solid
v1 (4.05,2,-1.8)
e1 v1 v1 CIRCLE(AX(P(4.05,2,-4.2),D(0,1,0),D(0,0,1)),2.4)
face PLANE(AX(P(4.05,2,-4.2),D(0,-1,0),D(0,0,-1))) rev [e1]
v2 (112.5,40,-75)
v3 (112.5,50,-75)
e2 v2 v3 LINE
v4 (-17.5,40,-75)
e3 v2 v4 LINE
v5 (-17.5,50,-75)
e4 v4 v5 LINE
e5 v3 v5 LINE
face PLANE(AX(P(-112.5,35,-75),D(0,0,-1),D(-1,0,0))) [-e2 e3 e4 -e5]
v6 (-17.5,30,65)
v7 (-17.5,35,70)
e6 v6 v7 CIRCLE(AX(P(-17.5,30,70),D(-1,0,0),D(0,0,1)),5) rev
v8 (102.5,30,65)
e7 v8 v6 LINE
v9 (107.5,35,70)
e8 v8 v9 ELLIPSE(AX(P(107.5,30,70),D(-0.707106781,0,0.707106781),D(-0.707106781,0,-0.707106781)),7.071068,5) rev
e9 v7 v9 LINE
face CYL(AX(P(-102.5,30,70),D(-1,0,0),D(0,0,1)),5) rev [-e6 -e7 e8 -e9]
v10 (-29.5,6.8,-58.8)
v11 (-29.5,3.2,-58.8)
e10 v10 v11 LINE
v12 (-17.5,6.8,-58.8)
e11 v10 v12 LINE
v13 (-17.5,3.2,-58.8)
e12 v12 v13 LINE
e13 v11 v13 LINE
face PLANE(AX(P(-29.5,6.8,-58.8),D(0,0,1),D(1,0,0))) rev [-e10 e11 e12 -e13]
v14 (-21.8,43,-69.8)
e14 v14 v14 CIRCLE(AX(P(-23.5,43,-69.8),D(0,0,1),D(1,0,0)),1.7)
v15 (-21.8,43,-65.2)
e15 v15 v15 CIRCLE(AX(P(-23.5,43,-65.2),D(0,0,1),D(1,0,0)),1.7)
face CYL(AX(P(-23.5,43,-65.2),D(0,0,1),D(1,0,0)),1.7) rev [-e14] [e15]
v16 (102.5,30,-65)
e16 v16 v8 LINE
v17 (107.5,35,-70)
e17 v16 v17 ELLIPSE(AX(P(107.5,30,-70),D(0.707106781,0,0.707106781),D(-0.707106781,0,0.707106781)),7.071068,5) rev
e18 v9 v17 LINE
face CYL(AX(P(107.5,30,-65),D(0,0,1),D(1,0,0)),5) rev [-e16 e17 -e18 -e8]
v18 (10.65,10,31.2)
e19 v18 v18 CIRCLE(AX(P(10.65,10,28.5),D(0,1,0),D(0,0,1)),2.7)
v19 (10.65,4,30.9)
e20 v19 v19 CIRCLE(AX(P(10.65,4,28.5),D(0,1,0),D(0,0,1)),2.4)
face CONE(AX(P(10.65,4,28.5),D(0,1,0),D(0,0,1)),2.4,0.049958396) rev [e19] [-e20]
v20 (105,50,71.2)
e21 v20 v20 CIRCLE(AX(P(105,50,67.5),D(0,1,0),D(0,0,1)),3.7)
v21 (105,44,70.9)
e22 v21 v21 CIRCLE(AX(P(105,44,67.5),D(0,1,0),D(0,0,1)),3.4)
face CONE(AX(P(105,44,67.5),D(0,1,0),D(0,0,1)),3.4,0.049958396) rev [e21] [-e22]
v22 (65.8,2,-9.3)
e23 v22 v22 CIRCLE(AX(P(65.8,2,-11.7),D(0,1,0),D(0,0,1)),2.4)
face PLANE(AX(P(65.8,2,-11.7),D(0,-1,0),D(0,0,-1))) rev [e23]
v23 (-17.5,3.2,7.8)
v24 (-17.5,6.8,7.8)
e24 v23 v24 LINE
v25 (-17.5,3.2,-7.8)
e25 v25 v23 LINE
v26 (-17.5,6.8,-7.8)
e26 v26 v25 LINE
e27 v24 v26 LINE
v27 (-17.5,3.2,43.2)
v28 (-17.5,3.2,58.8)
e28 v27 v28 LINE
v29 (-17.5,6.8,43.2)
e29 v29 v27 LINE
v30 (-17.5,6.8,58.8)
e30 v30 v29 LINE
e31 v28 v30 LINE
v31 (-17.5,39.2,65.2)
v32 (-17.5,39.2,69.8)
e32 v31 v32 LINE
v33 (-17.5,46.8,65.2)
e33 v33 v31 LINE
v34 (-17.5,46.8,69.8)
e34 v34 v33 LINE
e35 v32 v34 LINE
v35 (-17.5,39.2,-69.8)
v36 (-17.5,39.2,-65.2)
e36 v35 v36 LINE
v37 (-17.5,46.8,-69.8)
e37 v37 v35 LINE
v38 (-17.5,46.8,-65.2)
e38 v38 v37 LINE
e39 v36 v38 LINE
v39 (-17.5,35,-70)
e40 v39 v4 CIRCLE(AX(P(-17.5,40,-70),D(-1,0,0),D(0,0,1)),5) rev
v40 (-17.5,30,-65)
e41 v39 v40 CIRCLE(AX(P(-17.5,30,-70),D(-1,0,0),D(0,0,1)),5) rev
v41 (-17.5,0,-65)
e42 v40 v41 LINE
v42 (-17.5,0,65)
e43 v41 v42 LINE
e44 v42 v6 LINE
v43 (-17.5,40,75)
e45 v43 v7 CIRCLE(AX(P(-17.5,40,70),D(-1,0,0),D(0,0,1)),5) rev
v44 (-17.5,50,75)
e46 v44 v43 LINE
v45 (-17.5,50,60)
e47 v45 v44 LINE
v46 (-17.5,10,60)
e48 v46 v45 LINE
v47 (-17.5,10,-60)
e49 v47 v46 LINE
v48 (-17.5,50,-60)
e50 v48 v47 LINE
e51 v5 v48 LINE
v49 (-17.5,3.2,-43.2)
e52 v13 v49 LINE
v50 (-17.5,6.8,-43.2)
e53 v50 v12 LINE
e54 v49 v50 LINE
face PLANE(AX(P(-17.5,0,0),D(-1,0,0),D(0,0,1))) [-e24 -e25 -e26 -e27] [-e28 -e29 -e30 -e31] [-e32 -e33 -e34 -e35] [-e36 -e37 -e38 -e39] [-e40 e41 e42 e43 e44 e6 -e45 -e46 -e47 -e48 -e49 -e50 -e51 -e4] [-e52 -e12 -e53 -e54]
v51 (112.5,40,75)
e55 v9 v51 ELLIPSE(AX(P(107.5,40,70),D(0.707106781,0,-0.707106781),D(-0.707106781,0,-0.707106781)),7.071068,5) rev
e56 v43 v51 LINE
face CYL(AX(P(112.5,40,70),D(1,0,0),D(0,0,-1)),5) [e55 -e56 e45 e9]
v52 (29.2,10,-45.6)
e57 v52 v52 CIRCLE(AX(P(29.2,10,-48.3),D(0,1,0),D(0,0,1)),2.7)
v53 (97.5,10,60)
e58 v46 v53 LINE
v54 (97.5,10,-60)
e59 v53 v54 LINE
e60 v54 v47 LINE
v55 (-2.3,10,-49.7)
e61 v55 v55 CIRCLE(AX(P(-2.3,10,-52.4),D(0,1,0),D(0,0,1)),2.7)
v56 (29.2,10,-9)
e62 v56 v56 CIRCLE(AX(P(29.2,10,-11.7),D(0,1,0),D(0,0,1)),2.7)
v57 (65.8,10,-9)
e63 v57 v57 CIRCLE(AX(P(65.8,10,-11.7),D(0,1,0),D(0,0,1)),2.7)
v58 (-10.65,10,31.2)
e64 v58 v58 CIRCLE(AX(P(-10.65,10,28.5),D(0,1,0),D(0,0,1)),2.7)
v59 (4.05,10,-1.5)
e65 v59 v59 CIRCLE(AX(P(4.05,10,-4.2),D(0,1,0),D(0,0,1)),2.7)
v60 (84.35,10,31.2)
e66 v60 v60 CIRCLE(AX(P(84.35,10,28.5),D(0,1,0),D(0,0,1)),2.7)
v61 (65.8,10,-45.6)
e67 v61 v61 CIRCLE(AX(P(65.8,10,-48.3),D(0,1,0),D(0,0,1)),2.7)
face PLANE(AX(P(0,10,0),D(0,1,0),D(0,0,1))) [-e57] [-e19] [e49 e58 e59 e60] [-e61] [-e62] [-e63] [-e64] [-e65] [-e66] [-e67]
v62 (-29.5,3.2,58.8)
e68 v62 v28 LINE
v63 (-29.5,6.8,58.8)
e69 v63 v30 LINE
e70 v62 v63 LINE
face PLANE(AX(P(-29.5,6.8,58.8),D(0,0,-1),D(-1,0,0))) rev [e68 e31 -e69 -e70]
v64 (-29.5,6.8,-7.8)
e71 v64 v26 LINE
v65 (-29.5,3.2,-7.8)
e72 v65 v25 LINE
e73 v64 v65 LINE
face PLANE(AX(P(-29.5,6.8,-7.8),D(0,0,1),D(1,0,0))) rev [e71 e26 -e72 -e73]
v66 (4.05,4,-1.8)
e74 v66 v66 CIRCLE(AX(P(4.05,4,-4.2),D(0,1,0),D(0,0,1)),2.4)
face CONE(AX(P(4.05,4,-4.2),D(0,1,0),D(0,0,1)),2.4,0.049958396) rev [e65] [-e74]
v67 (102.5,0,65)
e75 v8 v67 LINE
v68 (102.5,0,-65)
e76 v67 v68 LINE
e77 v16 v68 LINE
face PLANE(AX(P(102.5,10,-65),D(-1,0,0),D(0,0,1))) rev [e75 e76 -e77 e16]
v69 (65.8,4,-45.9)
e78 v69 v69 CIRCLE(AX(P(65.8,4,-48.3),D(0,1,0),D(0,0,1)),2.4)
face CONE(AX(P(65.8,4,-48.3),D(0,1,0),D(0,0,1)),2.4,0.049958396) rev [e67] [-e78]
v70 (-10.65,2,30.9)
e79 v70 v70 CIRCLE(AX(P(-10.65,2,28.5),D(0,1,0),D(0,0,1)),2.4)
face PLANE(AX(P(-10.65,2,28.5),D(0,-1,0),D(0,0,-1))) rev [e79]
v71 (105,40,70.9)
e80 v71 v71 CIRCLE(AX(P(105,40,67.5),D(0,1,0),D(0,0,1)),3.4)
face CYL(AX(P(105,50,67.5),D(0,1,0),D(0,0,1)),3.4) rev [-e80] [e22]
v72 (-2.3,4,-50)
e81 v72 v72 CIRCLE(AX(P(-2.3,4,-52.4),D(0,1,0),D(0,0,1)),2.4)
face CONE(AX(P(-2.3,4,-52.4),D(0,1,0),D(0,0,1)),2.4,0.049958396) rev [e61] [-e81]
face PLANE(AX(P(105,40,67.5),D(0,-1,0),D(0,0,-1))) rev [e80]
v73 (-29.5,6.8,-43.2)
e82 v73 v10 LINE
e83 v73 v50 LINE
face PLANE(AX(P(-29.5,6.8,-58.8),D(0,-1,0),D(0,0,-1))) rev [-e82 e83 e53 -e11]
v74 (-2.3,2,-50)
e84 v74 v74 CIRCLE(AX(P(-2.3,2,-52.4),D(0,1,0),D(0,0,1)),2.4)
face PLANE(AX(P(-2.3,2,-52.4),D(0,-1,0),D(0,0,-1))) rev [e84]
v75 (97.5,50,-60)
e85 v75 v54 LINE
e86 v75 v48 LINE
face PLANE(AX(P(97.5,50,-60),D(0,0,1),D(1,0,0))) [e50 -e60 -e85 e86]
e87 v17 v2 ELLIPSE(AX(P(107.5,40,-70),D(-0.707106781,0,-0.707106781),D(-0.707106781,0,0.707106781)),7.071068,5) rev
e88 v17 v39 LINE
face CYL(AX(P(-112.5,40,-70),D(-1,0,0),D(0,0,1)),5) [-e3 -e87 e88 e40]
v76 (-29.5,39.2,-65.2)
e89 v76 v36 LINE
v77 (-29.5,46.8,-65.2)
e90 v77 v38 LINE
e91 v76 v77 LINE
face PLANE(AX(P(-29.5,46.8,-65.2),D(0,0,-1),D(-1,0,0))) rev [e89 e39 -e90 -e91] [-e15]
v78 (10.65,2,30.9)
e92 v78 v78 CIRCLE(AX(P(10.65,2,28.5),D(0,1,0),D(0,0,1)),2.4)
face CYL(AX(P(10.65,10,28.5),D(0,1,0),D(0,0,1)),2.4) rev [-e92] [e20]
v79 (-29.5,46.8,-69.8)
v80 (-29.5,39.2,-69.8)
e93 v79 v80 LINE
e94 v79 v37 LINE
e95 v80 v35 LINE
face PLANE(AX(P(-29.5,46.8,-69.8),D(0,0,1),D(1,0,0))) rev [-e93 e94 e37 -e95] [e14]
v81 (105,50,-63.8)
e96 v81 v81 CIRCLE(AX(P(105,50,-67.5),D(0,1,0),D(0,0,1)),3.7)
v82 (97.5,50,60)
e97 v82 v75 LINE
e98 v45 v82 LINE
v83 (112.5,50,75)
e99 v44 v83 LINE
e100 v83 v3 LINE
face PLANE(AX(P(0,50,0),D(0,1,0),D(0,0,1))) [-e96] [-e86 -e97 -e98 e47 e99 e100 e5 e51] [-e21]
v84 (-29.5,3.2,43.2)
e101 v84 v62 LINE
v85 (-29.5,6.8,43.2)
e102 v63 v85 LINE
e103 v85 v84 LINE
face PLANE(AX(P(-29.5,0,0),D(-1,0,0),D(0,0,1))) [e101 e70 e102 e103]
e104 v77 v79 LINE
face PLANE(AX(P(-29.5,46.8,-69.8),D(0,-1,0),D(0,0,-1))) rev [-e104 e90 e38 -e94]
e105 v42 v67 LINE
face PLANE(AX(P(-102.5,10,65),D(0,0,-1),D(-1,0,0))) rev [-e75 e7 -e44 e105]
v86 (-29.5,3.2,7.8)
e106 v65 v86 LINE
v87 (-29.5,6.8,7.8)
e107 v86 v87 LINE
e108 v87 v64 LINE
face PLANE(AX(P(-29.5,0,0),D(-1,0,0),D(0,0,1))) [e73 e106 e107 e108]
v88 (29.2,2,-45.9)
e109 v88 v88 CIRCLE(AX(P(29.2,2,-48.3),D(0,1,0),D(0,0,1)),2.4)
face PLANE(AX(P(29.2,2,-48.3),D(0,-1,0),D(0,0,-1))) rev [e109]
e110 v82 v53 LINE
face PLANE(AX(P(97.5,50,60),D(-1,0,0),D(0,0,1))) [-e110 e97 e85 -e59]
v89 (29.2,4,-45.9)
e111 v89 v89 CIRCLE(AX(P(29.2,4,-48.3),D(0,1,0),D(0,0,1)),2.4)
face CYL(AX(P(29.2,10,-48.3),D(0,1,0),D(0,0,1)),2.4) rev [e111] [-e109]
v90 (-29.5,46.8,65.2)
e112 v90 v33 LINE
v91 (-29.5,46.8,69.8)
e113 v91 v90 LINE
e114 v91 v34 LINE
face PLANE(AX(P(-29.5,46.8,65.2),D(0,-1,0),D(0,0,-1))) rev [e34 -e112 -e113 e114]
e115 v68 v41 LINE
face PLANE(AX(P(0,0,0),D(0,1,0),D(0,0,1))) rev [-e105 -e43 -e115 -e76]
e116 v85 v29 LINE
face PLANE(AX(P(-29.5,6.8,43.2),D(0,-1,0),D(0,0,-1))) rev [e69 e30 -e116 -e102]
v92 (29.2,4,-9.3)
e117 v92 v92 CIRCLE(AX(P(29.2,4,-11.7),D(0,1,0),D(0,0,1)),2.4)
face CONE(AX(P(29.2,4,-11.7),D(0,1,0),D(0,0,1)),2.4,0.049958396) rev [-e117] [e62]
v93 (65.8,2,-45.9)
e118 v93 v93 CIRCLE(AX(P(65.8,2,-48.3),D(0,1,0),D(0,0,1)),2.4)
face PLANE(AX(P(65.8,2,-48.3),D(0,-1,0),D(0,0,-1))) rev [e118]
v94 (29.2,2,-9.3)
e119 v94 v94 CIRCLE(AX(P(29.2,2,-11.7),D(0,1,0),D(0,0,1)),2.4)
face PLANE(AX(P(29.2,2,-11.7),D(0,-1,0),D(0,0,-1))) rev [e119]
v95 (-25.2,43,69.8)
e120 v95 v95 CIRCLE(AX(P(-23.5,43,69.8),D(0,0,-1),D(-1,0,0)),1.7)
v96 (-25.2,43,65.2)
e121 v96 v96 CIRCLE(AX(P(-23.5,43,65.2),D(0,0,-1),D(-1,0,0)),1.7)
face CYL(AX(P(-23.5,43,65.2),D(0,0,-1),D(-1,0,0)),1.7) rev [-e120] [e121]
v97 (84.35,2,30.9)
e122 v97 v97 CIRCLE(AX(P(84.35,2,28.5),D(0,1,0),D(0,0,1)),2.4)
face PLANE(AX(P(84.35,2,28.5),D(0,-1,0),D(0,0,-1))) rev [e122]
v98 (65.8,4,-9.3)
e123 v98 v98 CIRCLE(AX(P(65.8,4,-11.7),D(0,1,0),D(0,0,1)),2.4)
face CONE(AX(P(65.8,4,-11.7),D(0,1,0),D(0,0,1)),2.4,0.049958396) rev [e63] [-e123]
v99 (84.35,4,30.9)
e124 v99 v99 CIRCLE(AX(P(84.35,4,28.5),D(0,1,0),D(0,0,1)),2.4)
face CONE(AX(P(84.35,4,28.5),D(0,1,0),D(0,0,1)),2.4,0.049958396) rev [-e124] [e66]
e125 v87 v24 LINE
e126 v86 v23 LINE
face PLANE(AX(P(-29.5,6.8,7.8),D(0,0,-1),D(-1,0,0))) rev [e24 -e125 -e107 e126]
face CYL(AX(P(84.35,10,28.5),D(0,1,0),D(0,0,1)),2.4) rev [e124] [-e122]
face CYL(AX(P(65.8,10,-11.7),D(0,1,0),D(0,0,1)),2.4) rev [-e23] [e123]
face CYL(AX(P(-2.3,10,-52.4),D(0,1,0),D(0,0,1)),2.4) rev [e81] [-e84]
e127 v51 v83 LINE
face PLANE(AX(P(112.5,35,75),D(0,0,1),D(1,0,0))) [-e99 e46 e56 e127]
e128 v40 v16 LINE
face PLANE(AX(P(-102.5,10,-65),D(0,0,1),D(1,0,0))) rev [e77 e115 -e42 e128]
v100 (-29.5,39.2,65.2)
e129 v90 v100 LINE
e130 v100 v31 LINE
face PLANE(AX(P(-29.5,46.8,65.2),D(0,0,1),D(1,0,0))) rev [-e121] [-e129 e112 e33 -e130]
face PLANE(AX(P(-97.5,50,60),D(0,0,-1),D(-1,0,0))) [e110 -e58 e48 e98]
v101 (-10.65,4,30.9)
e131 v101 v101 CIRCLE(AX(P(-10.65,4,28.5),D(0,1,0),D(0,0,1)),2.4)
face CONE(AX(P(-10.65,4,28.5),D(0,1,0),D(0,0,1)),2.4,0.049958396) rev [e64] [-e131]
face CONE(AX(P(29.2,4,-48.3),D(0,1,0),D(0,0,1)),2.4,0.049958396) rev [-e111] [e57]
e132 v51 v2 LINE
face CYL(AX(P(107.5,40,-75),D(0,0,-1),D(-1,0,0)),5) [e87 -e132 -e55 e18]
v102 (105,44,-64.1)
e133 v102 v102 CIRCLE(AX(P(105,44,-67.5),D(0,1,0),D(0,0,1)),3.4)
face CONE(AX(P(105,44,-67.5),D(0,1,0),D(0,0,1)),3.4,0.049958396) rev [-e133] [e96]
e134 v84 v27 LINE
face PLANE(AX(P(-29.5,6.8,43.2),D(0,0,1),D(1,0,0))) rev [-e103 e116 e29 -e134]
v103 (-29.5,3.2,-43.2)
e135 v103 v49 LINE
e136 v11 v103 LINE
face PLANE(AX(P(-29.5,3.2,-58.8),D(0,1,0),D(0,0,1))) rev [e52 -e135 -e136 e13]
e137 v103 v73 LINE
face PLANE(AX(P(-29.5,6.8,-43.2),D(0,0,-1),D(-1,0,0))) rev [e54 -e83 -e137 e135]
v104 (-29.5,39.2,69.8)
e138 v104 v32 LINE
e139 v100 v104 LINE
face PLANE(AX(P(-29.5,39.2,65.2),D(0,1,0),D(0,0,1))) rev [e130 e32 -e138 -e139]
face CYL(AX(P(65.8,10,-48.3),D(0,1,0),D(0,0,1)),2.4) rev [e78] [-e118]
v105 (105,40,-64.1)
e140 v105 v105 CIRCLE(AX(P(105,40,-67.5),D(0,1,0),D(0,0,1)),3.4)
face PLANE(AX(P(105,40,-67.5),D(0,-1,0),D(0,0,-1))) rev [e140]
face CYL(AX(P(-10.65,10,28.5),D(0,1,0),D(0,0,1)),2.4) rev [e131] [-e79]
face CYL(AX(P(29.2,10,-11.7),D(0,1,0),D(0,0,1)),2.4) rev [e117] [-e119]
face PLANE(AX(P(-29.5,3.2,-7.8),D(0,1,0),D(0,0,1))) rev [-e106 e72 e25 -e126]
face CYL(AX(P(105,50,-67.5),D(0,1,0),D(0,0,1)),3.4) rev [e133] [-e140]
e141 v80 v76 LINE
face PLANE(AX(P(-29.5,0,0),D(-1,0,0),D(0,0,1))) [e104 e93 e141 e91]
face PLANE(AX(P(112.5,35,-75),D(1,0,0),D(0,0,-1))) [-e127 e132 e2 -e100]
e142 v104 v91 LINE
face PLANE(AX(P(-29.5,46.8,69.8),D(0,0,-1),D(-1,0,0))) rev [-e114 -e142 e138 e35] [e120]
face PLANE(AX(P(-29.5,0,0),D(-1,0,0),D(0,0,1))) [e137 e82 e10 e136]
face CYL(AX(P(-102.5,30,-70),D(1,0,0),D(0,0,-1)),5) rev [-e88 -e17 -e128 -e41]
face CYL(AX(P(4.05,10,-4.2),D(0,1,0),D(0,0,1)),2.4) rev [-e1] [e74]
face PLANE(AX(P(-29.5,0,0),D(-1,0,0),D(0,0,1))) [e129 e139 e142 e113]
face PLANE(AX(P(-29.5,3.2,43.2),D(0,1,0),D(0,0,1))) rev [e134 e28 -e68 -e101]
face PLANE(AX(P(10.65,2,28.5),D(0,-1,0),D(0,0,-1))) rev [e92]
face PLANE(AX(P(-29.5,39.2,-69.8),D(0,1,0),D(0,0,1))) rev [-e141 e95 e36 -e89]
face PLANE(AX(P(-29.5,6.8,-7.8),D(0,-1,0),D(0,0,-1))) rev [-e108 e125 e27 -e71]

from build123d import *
from OCP.BRepFilletAPI import BRepFilletAPI_MakeChamfer

# Parameters (mm, degrees)
SKETCH1_W                = 205
SKETCH1_H                = 130
BOSS_EXTRUDE1_DEPTH      = 10
SKETCH2_W                = 205
SKETCH2_H                = 130
SKETCH2_W_2              = 195
SKETCH2_H_2              = 120
BOSS_EXTRUDE2_DEPTH      = 40
CUT_EXTRUDE1_REACH       = 222.794
SKETCH6_W                = 60
SKETCH6_H                = 40
HOLE1_D                  = 4.8
HOLE1_DEPTH              = 8
HOLE1_CBORE_D            = 5.4
HOLE1_CBORE_DEPTH        = 6
CHAMFER1_SIZE            = 6
CHAMFER1_SIZE_2          = 0.3
BOSS_EXTRUDE3_DEPTH      = 15
FILLET1_R                = 5
HOLE2_D                  = 6.8
HOLE2_DEPTH              = 10
HOLE2_CBORE_D            = 7.4
HOLE2_CBORE_DEPTH        = 6
CHAMFER2_SIZE            = 6
CHAMFER2_SIZE_2          = 0.3
SKETCH14_W               = 179.585790587
SKETCH14_H               = 72.16534995
CUT_EXTRUDE2_DEPTH       = 150
SKETCH15_W               = 15.6
SKETCH15_H               = 3.6
SKETCH15_W_2             = 4.6
SKETCH15_H_2             = 7.6
BOSS_EXTRUDE4_DEPTH      = 12
M3_CLEARANCE_HOLE1_D     = 3.4
M3_CLEARANCE_HOLE1_DEPTH = 9.8


with BuildPart() as part:
    # Sketch1 → Boss-Extrude1 (new body)
    with BuildSketch(Plane(origin=(0, 0, 0), x_dir=(1, 0, 0), z_dir=(0, 1, 0))):
        Rectangle(SKETCH1_W, SKETCH1_H)
    extrude(amount=BOSS_EXTRUDE1_DEPTH)

    # Sketch2 → Boss-Extrude2 (add)
    with BuildSketch(Plane(origin=(0, 10, 0), x_dir=(1, 0, 0), z_dir=(0, 1, 0))):
        Rectangle(SKETCH2_W, SKETCH2_H)
        Rectangle(SKETCH2_W_2, SKETCH2_H_2, mode=Mode.SUBTRACT)
    extrude(amount=BOSS_EXTRUDE2_DEPTH)

    # Sketch6 → Cut-Extrude1 (cut, up to next)
    with BuildSketch(Plane.ZY.offset(102.5), mode=Mode.PRIVATE) as cut_extrude1_sk1:
        with Locations((-30, 30)):
            Rectangle(SKETCH6_W, SKETCH6_H)
    cut_extrude1_tool1 = extrude(cut_extrude1_sk1.sketch, amount=-CUT_EXTRUDE1_REACH, mode=Mode.PRIVATE) & part.part
    add(cut_extrude1_tool1.solids().sort_by_distance((-102.5, 30, -30))[0], mode=Mode.SUBTRACT)

    # Hole1
    with Locations(Plane(origin=(0, 10, 0), x_dir=(1, 0, 0), z_dir=(0, 1, 0))):
        with Locations((-84.35, -28.5), (-10.65, -28.5), (-78.5, 4.2), (-77.2, 52.4), (-26.4, 9.3), (-26.4, 37.2), (-2.3, 52.4), (4.05, 4.2), (29.2, 48.3), (65.8, 48.3), (65.8, 11.7), (29.2, 11.7), (10.65, -28.5), (84.35, -28.5)):
            CounterBoreHole(HOLE1_D / 2, HOLE1_CBORE_D / 2, HOLE1_CBORE_DEPTH, depth=HOLE1_DEPTH)

    # Chamfer1
    chamfer1_edges_1 = [part.edges().sort_by_distance(p)[0] for p in [
        (-5, 4, -52.4),
    ]]
    chamfer1_side_1 = [part.faces().sort_by_distance(p)[0] for p in [
        (-5, 4.006, -52.4),
    ]]
    chamfer1_edges_2 = [part.edges().sort_by_distance(p)[0] for p in [
        (-29.1, 4, -37.2),
    ]]
    chamfer1_side_2 = [part.faces().sort_by_distance(p)[0] for p in [
        (-29.1, 4.006, -37.2),
    ]]
    chamfer1_edges_3 = [part.edges().sort_by_distance(p)[0] for p in [
        (-29.1, 4, -9.3),
    ]]
    chamfer1_side_3 = [part.faces().sort_by_distance(p)[0] for p in [
        (-29.1, 4.006, -9.3),
    ]]
    chamfer1_edges_4 = [part.edges().sort_by_distance(p)[0] for p in [
        (-79.9, 4, -52.4),
    ]]
    chamfer1_side_4 = [part.faces().sort_by_distance(p)[0] for p in [
        (-79.9, 4.006, -52.4),
    ]]
    chamfer1_edges_5 = [part.edges().sort_by_distance(p)[0] for p in [
        (-81.2, 4, -4.2),
    ]]
    chamfer1_side_5 = [part.faces().sort_by_distance(p)[0] for p in [
        (-81.2, 4.006, -4.2),
    ]]
    chamfer1_edges_6 = [part.edges().sort_by_distance(p)[0] for p in [
        (-13.35, 4, 28.5),
    ]]
    chamfer1_side_6 = [part.faces().sort_by_distance(p)[0] for p in [
        (-13.35, 4.006, 28.5),
    ]]
    chamfer1_edges_7 = [part.edges().sort_by_distance(p)[0] for p in [
        (-87.05, 4, 28.5),
    ]]
    chamfer1_side_7 = [part.faces().sort_by_distance(p)[0] for p in [
        (-87.05, 4.006, 28.5),
    ]]
    chamfer1_edges_8 = [part.edges().sort_by_distance(p)[0] for p in [
        (81.65, 4, 28.5),
    ]]
    chamfer1_side_8 = [part.faces().sort_by_distance(p)[0] for p in [
        (81.65, 4.006, 28.5),
    ]]
    chamfer1_edges_9 = [part.edges().sort_by_distance(p)[0] for p in [
        (7.95, 4, 28.5),
    ]]
    chamfer1_side_9 = [part.faces().sort_by_distance(p)[0] for p in [
        (7.95, 4.006, 28.5),
    ]]
    chamfer1_edges_10 = [part.edges().sort_by_distance(p)[0] for p in [
        (26.5, 4, -11.7),
    ]]
    chamfer1_side_10 = [part.faces().sort_by_distance(p)[0] for p in [
        (26.5, 4.006, -11.7),
    ]]
    chamfer1_edges_11 = [part.edges().sort_by_distance(p)[0] for p in [
        (63.1, 4, -11.7),
    ]]
    chamfer1_side_11 = [part.faces().sort_by_distance(p)[0] for p in [
        (63.1, 4.006, -11.7),
    ]]
    chamfer1_edges_12 = [part.edges().sort_by_distance(p)[0] for p in [
        (63.1, 4, -48.3),
    ]]
    chamfer1_side_12 = [part.faces().sort_by_distance(p)[0] for p in [
        (63.1, 4.006, -48.3),
    ]]
    chamfer1_edges_13 = [part.edges().sort_by_distance(p)[0] for p in [
        (26.5, 4, -48.3),
    ]]
    chamfer1_side_13 = [part.faces().sort_by_distance(p)[0] for p in [
        (26.5, 4.006, -48.3),
    ]]
    chamfer1_edges_14 = [part.edges().sort_by_distance(p)[0] for p in [
        (1.35, 4, -4.2),
    ]]
    chamfer1_side_14 = [part.faces().sort_by_distance(p)[0] for p in [
        (1.35, 4.006, -4.2),
    ]]
    chamfer1 = BRepFilletAPI_MakeChamfer(part.part.solid().wrapped)
    for e in chamfer1_edges_1:
        chamfer1.Add(CHAMFER1_SIZE - 0.0001, CHAMFER1_SIZE_2 - 0.0001, e.wrapped, chamfer1_side_1[0].wrapped)
    for e in chamfer1_edges_2:
        chamfer1.Add(CHAMFER1_SIZE - 0.0001, CHAMFER1_SIZE_2 - 0.0001, e.wrapped, chamfer1_side_2[0].wrapped)
    for e in chamfer1_edges_3:
        chamfer1.Add(CHAMFER1_SIZE - 0.0001, CHAMFER1_SIZE_2 - 0.0001, e.wrapped, chamfer1_side_3[0].wrapped)
    for e in chamfer1_edges_4:
        chamfer1.Add(CHAMFER1_SIZE - 0.0001, CHAMFER1_SIZE_2 - 0.0001, e.wrapped, chamfer1_side_4[0].wrapped)
    for e in chamfer1_edges_5:
        chamfer1.Add(CHAMFER1_SIZE - 0.0001, CHAMFER1_SIZE_2 - 0.0001, e.wrapped, chamfer1_side_5[0].wrapped)
    for e in chamfer1_edges_6:
        chamfer1.Add(CHAMFER1_SIZE - 0.0001, CHAMFER1_SIZE_2 - 0.0001, e.wrapped, chamfer1_side_6[0].wrapped)
    for e in chamfer1_edges_7:
        chamfer1.Add(CHAMFER1_SIZE - 0.0001, CHAMFER1_SIZE_2 - 0.0001, e.wrapped, chamfer1_side_7[0].wrapped)
    for e in chamfer1_edges_8:
        chamfer1.Add(CHAMFER1_SIZE - 0.0001, CHAMFER1_SIZE_2 - 0.0001, e.wrapped, chamfer1_side_8[0].wrapped)
    for e in chamfer1_edges_9:
        chamfer1.Add(CHAMFER1_SIZE - 0.0001, CHAMFER1_SIZE_2 - 0.0001, e.wrapped, chamfer1_side_9[0].wrapped)
    for e in chamfer1_edges_10:
        chamfer1.Add(CHAMFER1_SIZE - 0.0001, CHAMFER1_SIZE_2 - 0.0001, e.wrapped, chamfer1_side_10[0].wrapped)
    for e in chamfer1_edges_11:
        chamfer1.Add(CHAMFER1_SIZE - 0.0001, CHAMFER1_SIZE_2 - 0.0001, e.wrapped, chamfer1_side_11[0].wrapped)
    for e in chamfer1_edges_12:
        chamfer1.Add(CHAMFER1_SIZE - 0.0001, CHAMFER1_SIZE_2 - 0.0001, e.wrapped, chamfer1_side_12[0].wrapped)
    for e in chamfer1_edges_13:
        chamfer1.Add(CHAMFER1_SIZE - 0.0001, CHAMFER1_SIZE_2 - 0.0001, e.wrapped, chamfer1_side_13[0].wrapped)
    for e in chamfer1_edges_14:
        chamfer1.Add(CHAMFER1_SIZE - 0.0001, CHAMFER1_SIZE_2 - 0.0001, e.wrapped, chamfer1_side_14[0].wrapped)
    add(Compound.cast(chamfer1.Shape()), mode=Mode.REPLACE)  # a hair under: the kernel refuses the full size

    # Sketch11 → Boss-Extrude3 (add)
    with BuildSketch(Plane(origin=(0, 50, 0), x_dir=(1, 0, 0), z_dir=(0, 1, 0))):
        Polygon((-112.5, 75), (112.5, 75), (112.5, -75), (-112.5, -75), (-112.5, 0), (-102.5, 0), (-102.5, -65), (102.5, -65), (102.5, 65), (-102.5, 65), (-102.5, 60), (-112.5, 60), align=None)
    extrude(amount=-BOSS_EXTRUDE3_DEPTH)

    # Fillet1
    fillet1_edges = [part.edges().sort_by_distance(p)[0] for p in [
        (-112.5, 35, 37.5),
        (0, 35, 75),
        (112.5, 35, 0),
        (0, 35, -75),
        (-102.5, 35, -62.5),
        (0, 35, -65),
        (102.5, 35, 0),
        (-102.5, 35, 32.5),
        (0, 35, 65),
    ]]
    fillet(fillet1_edges, radius=FILLET1_R - 0.0001)  # a hair under: the kernel refuses the full size

    # Hole2
    with Locations(Plane(origin=(0, 50, 0), x_dir=(1, 0, 0), z_dir=(0, 1, 0))):
        with Locations((-105, 67.5), (105, 67.5), (105, -67.5), (-105, -67.5)):
            CounterBoreHole(HOLE2_D / 2, HOLE2_CBORE_D / 2, HOLE2_CBORE_DEPTH, depth=HOLE2_DEPTH)

    # Chamfer2
    chamfer2_edges_1 = [part.edges().sort_by_distance(p)[0] for p in [
        (-108.7, 44, 67.5),
    ]]
    chamfer2_side_1 = [part.faces().sort_by_distance(p)[0] for p in [
        (-108.7, 44.006, 67.5),
    ]]
    chamfer2_edges_2 = [part.edges().sort_by_distance(p)[0] for p in [
        (101.3, 44, 67.5),
    ]]
    chamfer2_side_2 = [part.faces().sort_by_distance(p)[0] for p in [
        (101.3, 44.006, 67.5),
    ]]
    chamfer2_edges_3 = [part.edges().sort_by_distance(p)[0] for p in [
        (101.3, 44, -67.5),
    ]]
    chamfer2_side_3 = [part.faces().sort_by_distance(p)[0] for p in [
        (101.3, 44.006, -67.5),
    ]]
    chamfer2_edges_4 = [part.edges().sort_by_distance(p)[0] for p in [
        (-108.7, 44, -67.5),
    ]]
    chamfer2_side_4 = [part.faces().sort_by_distance(p)[0] for p in [
        (-108.7, 44.006, -67.5),
    ]]
    chamfer2 = BRepFilletAPI_MakeChamfer(part.part.solid().wrapped)
    for e in chamfer2_edges_1:
        chamfer2.Add(CHAMFER2_SIZE - 0.0001, CHAMFER2_SIZE_2 - 0.0001, e.wrapped, chamfer2_side_1[0].wrapped)
    for e in chamfer2_edges_2:
        chamfer2.Add(CHAMFER2_SIZE - 0.0001, CHAMFER2_SIZE_2 - 0.0001, e.wrapped, chamfer2_side_2[0].wrapped)
    for e in chamfer2_edges_3:
        chamfer2.Add(CHAMFER2_SIZE - 0.0001, CHAMFER2_SIZE_2 - 0.0001, e.wrapped, chamfer2_side_3[0].wrapped)
    for e in chamfer2_edges_4:
        chamfer2.Add(CHAMFER2_SIZE - 0.0001, CHAMFER2_SIZE_2 - 0.0001, e.wrapped, chamfer2_side_4[0].wrapped)
    add(Compound.cast(chamfer2.Shape()), mode=Mode.REPLACE)  # a hair under: the kernel refuses the full size

    # Sketch14 → Cut-Extrude2 (cut)
    with BuildSketch(Plane.ZY.offset(17.5)):
        with Locations((-1.737927005, 26.484477579)):
            Rectangle(SKETCH14_W, SKETCH14_H)
    extrude(amount=CUT_EXTRUDE2_DEPTH, mode=Mode.SUBTRACT)

    # Sketch15 → Boss-Extrude4 (add)
    with BuildSketch(Plane.ZY.offset(17.5)):
        with Locations((-51, 5)):
            Rectangle(SKETCH15_W, SKETCH15_H)
        with Locations((51, 5)):
            Rectangle(SKETCH15_W, SKETCH15_H)
        with Locations((0, 5)):
            Rectangle(SKETCH15_W, SKETCH15_H)
        with Locations((-67.5, 43)):
            Rectangle(SKETCH15_W_2, SKETCH15_H_2)
        with Locations((67.5, 43)):
            Rectangle(SKETCH15_W_2, SKETCH15_H_2)
    extrude(amount=BOSS_EXTRUDE4_DEPTH)

    # M3 Clearance Hole1
    with Locations(Plane.XY.offset(-65.2)):
        with Locations((-23.5, 43)):
            m3_clearance_hole1 = Hole(M3_CLEARANCE_HOLE1_D / 2, depth=M3_CLEARANCE_HOLE1_DEPTH)

    # Mirror1: M3 Clearance Hole1 across plane
    add(m3_clearance_hole1.mirror(Plane.XY), mode=Mode.SUBTRACT)


solid = part.part
